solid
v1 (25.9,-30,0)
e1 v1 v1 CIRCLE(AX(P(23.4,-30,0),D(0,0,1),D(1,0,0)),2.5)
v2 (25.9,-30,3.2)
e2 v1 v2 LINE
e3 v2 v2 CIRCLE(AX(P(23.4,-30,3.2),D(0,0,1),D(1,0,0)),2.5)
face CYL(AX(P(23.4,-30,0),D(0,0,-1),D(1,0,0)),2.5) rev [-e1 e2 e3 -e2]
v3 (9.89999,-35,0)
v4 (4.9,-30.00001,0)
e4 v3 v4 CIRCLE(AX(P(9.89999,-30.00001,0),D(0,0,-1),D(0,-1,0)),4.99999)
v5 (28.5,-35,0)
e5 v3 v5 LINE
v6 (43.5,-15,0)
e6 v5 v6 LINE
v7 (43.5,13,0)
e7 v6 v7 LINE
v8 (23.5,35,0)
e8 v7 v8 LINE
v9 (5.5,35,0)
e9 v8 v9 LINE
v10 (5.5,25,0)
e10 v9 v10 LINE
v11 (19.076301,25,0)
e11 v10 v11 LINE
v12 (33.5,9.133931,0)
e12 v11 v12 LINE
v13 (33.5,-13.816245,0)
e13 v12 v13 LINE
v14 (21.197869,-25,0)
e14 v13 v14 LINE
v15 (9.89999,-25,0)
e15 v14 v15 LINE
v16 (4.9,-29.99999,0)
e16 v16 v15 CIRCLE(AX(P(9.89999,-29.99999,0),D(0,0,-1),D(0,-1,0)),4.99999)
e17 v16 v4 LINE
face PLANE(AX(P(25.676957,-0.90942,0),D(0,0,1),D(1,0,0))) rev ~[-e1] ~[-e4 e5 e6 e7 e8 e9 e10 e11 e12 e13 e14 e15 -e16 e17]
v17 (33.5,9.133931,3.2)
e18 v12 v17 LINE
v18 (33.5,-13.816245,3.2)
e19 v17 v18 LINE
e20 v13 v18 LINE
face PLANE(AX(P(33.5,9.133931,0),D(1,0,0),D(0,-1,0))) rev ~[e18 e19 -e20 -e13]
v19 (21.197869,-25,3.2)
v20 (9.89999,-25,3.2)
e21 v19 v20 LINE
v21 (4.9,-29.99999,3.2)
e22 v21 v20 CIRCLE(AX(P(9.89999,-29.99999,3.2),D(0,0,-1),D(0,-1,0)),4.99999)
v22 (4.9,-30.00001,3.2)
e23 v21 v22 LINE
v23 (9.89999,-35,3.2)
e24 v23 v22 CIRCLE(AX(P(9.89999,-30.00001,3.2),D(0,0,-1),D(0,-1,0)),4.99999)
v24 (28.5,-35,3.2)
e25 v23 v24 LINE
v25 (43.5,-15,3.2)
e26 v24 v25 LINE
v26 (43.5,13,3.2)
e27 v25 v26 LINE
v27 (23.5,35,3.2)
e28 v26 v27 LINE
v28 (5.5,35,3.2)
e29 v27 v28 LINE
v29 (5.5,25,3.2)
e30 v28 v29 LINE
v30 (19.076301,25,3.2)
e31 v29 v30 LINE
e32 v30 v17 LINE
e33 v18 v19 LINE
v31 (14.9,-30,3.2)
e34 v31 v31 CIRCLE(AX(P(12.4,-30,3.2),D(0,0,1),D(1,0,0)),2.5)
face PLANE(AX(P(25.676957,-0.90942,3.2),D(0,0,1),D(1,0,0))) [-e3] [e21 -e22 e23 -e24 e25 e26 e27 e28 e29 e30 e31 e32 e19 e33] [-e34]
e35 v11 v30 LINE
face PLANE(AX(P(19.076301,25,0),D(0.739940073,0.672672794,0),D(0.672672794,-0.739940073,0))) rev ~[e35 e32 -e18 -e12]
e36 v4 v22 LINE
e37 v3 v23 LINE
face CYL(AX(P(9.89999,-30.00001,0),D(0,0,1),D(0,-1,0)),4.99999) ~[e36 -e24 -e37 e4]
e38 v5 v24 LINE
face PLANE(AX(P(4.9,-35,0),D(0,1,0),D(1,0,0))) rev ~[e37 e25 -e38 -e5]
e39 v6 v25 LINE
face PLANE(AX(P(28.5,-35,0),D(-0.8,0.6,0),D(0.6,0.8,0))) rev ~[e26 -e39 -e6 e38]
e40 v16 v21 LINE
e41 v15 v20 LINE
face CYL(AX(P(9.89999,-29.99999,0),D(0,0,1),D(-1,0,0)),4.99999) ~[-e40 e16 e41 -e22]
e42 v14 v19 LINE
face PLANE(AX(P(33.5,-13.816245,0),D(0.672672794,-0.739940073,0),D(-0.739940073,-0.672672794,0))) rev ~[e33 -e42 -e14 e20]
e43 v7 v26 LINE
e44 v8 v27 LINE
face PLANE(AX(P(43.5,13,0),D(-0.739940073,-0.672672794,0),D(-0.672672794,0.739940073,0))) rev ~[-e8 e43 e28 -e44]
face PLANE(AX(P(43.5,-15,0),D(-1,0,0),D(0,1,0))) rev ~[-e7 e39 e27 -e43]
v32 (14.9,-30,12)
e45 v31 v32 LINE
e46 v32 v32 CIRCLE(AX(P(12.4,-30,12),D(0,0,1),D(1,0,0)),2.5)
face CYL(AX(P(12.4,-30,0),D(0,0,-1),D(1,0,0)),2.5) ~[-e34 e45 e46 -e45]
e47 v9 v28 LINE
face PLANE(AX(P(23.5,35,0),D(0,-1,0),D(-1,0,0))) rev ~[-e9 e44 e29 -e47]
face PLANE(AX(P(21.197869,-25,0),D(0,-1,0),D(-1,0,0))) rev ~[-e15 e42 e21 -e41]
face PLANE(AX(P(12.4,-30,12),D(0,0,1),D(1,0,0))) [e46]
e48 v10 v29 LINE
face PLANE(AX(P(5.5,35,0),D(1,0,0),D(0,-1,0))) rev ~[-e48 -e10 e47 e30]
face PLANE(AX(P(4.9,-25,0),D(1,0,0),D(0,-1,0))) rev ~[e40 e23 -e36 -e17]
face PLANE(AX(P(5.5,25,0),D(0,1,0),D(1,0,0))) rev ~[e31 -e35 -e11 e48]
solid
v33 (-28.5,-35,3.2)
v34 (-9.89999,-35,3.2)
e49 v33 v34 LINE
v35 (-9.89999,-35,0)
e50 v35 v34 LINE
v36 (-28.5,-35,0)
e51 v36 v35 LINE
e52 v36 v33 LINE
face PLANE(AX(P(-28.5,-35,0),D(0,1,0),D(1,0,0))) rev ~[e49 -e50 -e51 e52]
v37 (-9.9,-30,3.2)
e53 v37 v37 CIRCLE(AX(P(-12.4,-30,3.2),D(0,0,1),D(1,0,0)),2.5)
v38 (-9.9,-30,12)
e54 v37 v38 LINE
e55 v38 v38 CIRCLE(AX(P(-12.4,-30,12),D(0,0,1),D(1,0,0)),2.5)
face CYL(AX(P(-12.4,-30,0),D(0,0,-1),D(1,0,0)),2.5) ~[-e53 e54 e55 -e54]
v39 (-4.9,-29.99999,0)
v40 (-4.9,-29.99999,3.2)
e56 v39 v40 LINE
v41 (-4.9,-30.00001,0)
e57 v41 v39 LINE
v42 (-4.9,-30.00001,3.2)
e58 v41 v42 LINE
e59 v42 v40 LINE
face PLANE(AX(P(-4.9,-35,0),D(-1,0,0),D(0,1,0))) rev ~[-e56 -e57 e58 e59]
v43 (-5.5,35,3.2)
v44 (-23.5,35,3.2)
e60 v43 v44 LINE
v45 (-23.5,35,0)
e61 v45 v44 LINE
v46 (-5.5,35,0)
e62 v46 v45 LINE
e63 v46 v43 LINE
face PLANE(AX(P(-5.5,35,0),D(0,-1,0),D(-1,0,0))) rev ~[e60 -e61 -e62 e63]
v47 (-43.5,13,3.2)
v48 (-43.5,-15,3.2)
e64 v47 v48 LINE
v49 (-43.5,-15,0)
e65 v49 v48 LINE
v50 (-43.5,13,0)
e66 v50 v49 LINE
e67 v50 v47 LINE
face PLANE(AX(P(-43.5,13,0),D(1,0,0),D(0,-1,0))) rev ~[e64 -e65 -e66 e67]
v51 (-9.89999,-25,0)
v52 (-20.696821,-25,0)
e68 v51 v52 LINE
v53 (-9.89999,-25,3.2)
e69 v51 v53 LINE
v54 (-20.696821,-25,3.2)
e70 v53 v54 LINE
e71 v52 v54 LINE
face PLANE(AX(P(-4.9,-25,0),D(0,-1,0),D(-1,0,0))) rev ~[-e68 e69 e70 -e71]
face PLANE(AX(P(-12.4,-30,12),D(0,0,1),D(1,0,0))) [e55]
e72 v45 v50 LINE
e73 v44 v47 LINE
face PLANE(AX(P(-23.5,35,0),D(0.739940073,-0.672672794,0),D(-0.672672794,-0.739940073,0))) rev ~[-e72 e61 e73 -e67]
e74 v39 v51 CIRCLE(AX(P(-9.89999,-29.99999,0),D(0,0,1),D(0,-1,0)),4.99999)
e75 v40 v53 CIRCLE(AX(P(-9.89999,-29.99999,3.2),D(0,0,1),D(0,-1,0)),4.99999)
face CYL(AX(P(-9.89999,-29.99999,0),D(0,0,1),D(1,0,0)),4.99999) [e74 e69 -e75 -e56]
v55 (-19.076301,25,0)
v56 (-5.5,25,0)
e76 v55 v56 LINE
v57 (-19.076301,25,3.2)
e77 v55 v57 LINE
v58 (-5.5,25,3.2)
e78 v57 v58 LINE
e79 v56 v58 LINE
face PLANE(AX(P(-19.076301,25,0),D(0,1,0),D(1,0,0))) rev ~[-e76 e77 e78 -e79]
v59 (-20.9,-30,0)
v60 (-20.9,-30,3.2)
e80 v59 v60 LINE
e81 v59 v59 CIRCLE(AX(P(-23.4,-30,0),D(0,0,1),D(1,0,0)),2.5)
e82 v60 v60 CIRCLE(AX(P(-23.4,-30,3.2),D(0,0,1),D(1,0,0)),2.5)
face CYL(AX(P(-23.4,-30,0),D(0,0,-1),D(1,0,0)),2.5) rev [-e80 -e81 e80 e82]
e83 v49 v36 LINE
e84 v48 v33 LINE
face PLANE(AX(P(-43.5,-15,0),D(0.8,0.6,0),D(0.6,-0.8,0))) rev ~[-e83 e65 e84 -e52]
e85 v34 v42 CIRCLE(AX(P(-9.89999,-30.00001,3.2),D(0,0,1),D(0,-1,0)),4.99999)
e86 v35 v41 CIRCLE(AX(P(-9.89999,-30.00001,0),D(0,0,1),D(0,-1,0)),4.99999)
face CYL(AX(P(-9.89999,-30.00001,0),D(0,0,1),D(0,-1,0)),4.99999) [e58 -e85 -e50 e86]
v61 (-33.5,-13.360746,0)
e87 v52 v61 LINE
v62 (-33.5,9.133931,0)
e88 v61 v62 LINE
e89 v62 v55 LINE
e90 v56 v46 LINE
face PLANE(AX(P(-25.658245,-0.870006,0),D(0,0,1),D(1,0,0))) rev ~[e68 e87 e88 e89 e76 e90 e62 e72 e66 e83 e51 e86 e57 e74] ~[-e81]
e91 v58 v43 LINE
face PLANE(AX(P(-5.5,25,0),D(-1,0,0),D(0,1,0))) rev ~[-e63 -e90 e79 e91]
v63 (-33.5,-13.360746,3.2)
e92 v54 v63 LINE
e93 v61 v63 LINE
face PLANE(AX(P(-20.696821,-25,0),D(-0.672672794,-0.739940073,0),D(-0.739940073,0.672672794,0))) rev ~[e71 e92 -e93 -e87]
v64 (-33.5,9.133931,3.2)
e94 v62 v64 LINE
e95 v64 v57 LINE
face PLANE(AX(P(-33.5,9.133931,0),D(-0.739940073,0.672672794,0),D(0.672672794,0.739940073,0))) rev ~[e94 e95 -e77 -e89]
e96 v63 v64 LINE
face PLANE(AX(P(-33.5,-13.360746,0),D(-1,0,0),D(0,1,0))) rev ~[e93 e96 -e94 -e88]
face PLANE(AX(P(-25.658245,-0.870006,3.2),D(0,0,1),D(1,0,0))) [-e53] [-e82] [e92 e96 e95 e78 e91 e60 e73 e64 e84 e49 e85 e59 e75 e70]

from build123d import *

# Parameters (mm, degrees)
F0_R     = 2.5
F1_DEPTH = 3.2
F2_DEPTH = 12
F3_DEPTH = 12
F4_R     = 4.99999
F5_R     = 4.99999


# Not quite as in the source:
# - a fillet or chamfer is up to 0.001 mm smaller than in the source, because OpenCascade refuses the exact size


with BuildPart() as f1:
    # F0 (on Top) → F1 (new body)
    with BuildSketch(Plane.XY):
        Polygon((4.9, -35), (28.5, -35), (43.5, -15), (43.5, 13), (23.5, 35), (5.5, 35), (5.5, 25), (19.0763011388, 25), (33.5, 9.1339312527), (33.5, -13.8162449002), (21.1978693902, -25), (4.9, -25), align=None)
        with Locations((12.4, -30)):
            Circle(F0_R, mode=Mode.SUBTRACT)
        with Locations((23.4, -30)):
            Circle(F0_R, mode=Mode.SUBTRACT)
    extrude(amount=F1_DEPTH)

    # F0 (on Top) → F2 (join)
    with BuildSketch(Plane.XY):
        with Locations((12.4, -30)):
            Circle(F0_R)
    extrude(amount=F2_DEPTH)

    # F4 (radius 5 in the source; OpenCascade refuses exactly that, so slightly less here)
    f4_edges = [f1.edges().sort_by_distance(p)[0] for p in [
        (4.9, -35, 1.6),
        (4.9, -25, 1.6),
    ]]
    fillet(f4_edges, radius=F4_R)


with BuildPart() as f1b:
    # F0 (on Top) → F1, piece 2 (new body)
    with BuildSketch(Plane.XY):
        Polygon((-28.5, -35), (-4.9, -35), (-4.9, -25), (-20.6968208253, -25), (-33.5, -13.3607462049), (-33.5, 9.1339312527), (-19.0763011388, 25), (-5.5, 25), (-5.5, 35), (-23.5, 35), (-43.5, 13), (-43.5, -15), align=None)
        with Locations((-23.4, -30)):
            Circle(F0_R, mode=Mode.SUBTRACT)
        with Locations((-12.4, -30)):
            Circle(F0_R, mode=Mode.SUBTRACT)
    extrude(amount=F1_DEPTH)

    # F0 (on Top) → F3 (join)
    with BuildSketch(Plane.XY):
        with Locations((-12.4, -30)):
            Circle(F0_R)
    extrude(amount=F3_DEPTH)

    # F5 (radius 5 in the source; OpenCascade refuses exactly that, so slightly less here)
    f5_edges = [f1b.edges().sort_by_distance(p)[0] for p in [
        (-4.9, -35, 1.6),
        (-4.9, -25, 1.6),
    ]]
    fillet(f5_edges, radius=F5_R)


solid = Compound([f1.part, f1b.part])
